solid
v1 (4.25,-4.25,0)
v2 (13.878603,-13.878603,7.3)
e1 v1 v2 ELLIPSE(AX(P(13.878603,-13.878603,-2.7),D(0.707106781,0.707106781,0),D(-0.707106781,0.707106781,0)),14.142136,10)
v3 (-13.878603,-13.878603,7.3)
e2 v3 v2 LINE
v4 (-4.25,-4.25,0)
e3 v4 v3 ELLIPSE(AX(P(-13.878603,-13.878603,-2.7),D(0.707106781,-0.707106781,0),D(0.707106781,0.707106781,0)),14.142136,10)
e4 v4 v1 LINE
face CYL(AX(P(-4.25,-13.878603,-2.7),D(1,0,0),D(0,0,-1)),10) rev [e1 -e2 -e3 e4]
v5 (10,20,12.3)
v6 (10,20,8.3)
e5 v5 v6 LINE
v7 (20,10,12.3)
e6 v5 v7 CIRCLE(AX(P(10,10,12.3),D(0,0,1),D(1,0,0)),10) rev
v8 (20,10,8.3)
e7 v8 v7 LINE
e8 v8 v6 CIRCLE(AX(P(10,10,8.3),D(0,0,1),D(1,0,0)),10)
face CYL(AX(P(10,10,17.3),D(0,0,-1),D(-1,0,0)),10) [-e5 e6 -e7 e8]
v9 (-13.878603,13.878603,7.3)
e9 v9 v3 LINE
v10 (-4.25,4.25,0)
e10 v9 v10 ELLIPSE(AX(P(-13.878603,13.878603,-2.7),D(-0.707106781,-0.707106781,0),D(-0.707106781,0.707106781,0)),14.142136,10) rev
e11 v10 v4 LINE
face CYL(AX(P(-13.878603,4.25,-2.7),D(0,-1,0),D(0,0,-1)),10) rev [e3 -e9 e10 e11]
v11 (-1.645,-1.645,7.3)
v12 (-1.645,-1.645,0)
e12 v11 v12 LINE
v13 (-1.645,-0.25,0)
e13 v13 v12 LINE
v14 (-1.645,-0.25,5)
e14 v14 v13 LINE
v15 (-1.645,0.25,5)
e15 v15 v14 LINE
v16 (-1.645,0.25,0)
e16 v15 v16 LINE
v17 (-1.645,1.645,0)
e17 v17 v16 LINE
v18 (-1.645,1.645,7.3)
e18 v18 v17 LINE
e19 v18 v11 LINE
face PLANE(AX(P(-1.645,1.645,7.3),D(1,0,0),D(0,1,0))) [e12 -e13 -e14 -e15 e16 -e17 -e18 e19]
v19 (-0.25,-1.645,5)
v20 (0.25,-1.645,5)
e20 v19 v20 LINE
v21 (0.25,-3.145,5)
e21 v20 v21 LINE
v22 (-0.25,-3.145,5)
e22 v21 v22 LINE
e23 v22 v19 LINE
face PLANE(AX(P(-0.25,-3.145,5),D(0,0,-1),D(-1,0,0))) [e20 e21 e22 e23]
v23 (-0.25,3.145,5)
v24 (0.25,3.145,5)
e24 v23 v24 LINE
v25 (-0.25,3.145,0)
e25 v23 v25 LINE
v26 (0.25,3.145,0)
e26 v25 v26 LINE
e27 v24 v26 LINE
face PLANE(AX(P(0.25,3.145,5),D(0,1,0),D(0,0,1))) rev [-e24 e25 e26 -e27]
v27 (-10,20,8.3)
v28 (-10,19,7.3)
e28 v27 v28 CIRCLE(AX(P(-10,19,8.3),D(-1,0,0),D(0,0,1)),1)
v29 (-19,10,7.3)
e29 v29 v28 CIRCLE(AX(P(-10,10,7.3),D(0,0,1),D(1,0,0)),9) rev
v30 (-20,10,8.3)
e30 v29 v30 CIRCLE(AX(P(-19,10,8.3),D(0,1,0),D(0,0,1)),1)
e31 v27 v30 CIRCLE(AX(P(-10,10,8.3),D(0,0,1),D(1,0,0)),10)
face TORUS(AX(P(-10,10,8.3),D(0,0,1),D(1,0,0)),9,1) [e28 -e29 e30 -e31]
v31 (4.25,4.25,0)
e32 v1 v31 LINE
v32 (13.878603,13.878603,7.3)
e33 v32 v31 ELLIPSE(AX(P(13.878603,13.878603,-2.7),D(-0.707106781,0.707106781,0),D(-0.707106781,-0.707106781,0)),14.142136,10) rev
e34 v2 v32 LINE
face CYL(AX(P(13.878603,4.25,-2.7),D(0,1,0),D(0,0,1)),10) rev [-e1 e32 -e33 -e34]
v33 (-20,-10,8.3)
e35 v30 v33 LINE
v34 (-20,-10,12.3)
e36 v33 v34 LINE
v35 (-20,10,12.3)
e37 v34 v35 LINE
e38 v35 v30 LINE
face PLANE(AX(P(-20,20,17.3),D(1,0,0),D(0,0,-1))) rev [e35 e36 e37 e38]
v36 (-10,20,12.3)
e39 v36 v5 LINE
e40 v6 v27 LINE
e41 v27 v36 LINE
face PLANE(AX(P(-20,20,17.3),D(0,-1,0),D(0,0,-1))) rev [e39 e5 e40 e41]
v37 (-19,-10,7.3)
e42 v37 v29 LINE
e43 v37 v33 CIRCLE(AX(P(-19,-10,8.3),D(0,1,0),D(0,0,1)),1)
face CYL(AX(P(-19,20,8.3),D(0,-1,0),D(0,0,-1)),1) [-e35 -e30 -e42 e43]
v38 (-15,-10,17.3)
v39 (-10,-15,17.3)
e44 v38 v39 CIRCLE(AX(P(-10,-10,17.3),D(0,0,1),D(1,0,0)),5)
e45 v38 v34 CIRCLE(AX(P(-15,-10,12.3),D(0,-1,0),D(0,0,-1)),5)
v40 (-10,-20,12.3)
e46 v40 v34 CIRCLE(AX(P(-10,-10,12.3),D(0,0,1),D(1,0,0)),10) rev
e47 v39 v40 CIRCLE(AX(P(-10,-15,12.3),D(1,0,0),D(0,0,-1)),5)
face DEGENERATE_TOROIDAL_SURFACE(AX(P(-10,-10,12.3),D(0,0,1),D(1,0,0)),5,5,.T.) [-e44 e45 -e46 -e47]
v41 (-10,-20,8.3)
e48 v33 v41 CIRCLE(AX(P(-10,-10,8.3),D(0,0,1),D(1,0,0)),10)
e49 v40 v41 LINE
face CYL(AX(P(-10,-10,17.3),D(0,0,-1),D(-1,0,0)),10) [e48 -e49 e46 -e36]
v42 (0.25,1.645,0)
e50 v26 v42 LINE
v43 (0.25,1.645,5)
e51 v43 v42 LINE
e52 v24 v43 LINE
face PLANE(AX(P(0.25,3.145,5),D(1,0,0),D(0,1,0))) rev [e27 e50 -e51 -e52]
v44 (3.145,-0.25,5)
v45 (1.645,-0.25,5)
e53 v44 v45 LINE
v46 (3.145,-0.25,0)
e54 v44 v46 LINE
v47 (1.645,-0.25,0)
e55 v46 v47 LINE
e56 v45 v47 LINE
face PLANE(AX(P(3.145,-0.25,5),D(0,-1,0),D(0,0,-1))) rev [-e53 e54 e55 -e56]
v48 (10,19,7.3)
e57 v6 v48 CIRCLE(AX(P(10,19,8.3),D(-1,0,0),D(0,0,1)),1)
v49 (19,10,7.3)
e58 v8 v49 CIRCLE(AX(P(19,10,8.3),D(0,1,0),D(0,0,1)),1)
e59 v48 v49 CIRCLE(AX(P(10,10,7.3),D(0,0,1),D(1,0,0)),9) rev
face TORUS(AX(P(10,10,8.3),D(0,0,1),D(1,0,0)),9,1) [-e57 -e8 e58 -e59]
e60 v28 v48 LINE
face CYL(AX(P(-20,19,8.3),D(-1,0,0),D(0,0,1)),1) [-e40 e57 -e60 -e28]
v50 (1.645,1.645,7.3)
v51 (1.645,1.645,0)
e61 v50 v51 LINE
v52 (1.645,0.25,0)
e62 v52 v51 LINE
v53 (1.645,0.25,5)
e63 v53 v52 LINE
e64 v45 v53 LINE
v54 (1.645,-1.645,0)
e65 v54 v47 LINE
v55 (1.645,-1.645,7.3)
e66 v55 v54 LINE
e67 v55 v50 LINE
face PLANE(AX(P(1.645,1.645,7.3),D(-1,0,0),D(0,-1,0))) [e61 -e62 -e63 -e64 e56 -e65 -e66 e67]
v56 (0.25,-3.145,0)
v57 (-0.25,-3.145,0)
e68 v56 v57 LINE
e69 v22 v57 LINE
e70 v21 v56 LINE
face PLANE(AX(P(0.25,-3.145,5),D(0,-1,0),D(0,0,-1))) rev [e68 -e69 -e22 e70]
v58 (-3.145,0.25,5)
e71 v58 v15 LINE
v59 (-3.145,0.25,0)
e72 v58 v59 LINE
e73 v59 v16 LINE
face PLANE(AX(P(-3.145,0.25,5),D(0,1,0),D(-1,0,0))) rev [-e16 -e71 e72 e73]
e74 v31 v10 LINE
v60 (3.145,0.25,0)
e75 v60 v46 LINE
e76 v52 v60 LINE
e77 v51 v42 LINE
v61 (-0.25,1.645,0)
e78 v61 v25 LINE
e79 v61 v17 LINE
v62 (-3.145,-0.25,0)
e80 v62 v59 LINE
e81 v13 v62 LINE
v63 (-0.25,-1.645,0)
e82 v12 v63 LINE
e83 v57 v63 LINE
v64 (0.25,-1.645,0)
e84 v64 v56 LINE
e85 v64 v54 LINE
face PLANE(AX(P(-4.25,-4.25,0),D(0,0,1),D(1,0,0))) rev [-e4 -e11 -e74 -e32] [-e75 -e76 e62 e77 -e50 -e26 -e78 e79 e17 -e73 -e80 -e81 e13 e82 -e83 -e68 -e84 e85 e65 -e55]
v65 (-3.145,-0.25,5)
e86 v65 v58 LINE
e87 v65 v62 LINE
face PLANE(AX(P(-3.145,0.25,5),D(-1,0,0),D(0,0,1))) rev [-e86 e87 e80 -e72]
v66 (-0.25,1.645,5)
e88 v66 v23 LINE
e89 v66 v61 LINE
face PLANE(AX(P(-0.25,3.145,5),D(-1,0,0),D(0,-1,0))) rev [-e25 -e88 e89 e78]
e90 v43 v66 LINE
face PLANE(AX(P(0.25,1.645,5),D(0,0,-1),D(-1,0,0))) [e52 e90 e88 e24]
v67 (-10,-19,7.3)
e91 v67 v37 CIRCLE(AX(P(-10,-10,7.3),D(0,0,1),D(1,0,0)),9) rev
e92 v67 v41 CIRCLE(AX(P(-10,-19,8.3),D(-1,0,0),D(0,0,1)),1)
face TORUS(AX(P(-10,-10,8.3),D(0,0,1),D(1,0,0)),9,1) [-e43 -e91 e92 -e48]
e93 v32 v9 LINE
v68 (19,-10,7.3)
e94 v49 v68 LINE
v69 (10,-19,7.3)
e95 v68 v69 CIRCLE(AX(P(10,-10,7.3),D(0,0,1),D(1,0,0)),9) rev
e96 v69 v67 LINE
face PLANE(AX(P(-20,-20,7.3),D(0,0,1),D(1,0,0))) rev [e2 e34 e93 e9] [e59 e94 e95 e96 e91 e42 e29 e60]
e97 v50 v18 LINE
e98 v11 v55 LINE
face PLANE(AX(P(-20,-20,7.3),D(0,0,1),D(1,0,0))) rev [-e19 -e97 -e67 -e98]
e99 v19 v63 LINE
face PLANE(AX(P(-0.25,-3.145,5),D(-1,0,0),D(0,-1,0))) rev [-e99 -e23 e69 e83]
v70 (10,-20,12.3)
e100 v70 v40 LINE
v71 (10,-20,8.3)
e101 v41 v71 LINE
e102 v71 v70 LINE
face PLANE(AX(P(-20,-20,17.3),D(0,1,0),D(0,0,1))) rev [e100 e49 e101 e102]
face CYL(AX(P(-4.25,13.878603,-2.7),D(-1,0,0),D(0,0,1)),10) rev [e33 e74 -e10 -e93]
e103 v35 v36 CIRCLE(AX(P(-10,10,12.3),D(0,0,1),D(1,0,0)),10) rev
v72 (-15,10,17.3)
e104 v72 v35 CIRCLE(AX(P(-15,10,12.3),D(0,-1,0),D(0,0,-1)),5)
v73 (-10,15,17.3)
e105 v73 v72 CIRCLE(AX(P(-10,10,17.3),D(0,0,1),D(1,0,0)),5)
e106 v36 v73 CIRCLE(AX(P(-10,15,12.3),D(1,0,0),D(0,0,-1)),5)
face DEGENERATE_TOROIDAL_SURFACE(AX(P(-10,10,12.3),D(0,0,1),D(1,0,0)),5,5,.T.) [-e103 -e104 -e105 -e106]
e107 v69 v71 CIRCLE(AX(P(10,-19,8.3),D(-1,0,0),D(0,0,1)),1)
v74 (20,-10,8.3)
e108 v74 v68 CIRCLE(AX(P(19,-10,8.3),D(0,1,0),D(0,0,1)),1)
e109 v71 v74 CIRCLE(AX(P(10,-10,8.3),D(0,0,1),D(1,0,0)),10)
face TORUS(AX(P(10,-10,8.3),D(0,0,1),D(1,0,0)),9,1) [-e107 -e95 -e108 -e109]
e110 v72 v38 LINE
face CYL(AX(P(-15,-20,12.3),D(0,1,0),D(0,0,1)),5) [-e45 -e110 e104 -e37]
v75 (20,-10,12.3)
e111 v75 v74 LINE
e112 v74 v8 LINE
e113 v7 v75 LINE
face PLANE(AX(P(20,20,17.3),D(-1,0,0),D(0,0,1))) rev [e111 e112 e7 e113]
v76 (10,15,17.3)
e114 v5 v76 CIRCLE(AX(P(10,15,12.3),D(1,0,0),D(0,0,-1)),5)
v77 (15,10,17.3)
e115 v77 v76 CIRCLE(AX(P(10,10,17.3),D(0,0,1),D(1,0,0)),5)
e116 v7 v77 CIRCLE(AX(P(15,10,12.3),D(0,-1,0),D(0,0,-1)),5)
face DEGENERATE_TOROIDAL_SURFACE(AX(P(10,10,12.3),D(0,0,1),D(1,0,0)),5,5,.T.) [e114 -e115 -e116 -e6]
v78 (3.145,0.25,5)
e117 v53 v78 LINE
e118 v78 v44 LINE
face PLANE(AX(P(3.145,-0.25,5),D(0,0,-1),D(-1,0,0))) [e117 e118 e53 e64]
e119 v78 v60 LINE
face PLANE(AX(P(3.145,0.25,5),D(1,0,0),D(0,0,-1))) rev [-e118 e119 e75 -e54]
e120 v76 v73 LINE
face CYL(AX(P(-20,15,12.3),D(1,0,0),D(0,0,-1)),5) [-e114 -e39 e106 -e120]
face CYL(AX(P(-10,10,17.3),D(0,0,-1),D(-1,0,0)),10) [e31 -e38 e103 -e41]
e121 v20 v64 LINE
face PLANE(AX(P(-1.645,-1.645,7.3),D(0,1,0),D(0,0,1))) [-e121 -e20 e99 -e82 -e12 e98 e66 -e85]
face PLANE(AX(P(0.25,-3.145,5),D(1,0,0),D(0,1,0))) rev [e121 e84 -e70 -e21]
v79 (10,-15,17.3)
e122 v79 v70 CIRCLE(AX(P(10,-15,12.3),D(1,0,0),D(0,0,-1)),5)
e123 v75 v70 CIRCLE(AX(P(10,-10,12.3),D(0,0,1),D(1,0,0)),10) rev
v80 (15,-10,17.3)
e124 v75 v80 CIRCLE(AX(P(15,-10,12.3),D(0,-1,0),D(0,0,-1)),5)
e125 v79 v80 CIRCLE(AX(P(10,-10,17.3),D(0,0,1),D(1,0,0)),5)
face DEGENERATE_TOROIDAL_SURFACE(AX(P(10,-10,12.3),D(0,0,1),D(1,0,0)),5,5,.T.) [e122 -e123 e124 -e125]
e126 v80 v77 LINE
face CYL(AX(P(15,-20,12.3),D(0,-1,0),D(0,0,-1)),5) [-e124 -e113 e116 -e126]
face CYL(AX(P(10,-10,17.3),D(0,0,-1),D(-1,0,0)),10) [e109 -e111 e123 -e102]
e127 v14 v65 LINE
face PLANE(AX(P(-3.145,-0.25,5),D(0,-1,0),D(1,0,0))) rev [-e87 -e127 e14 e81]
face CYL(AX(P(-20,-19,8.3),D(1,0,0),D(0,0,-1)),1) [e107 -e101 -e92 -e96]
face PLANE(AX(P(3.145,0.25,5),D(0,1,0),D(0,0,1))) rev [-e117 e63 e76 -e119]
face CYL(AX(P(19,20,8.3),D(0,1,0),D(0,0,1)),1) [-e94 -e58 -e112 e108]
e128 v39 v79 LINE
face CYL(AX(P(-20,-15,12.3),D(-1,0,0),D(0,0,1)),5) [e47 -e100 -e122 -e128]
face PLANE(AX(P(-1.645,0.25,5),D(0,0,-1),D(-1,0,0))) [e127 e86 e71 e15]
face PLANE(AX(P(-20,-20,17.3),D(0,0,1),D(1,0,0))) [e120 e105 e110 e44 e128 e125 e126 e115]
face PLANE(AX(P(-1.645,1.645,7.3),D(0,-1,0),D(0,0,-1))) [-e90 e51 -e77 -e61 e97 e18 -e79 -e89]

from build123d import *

# Parameters (mm, degrees)
ESBO_O1_W                = 8.5
ESBO_O1_H                = 8.5
ESBO_O1_W_2              = 3.29
ESBO_O1_H_2              = 3.29
RESSALTO_EXTRUS_O1_DEPTH = 7.3
ESBO_O2_W                = 40
ESBO_O2_H                = 40
RESSALTO_EXTRUS_O2_DEPTH = 10
FILETE1_R                = 10
FILETE2_R                = 10
FILETE3_R                = 5
ESBO_O3_W                = 0.5
ESBO_O3_H                = 1.5
ESBO_O3_W_2              = 1.5
ESBO_O3_H_2              = 0.5
CORTE_EXTRUS_O1_DEPTH    = 5
FILETE4_R                = 1


with BuildPart() as part:
    # Esboço1 → Ressalto-extrusão1 (new body)
    with BuildSketch(Plane.XY):
        Rectangle(ESBO_O1_W, ESBO_O1_H)
        Rectangle(ESBO_O1_W_2, ESBO_O1_H_2, mode=Mode.SUBTRACT)
    extrude(amount=RESSALTO_EXTRUS_O1_DEPTH)

    # Esboço2 → Ressalto-extrusão2 (add)
    with BuildSketch(Plane.XY.offset(7.3)):
        Rectangle(ESBO_O2_W, ESBO_O2_H)
    extrude(amount=RESSALTO_EXTRUS_O2_DEPTH)

    # Filete1
    # the kernel refuses this fillet: 10 mm, written as the material it adds along each edge
    with BuildSketch(Plane(origin=(-4.25, -4.25, 7.3), x_dir=(-1, 0, 0), z_dir=(0, 1, 0)), Plane(origin=(4.25, -4.25, 7.3), x_dir=(0, -1, 0), z_dir=(-1, 0, 0)), Plane(origin=(4.25, 4.25, 7.3), x_dir=(1, 0, 0), z_dir=(0, -1, 0)), Plane(origin=(-4.25, 4.25, 7.3), x_dir=(0, 1, 0), z_dir=(1, 0, 0))) as filete1_piece_1:
        with BuildLine():
            CenterArc((9.628603222, -10), FILETE1_R, 90, 74.335733149)
            Line((0, -7.3), (-0.192572064, -7.246))
            ThreePointArc((-0.192572064, -7.246), (-0.2, -3.65), (-0.2, 0))
            Line((-0.2, 0), (0, 0.2))
            Line((0, 0.2), (9.628603222, 0.2))
            Line((9.628603222, 0.2), (9.628603222, 0))
        make_face()
    extrude(amount=8.5)
    with BuildSketch(Plane(origin=(4.25, -4.25, 7.3), x_dir=(0, -1, 0), z_dir=(-1, 0, 0))) as filete1_piece_2a_section:
        with BuildLine():
            CenterArc((9.628603222, -10), FILETE1_R, 90, 74.335733149)
            Line((0, -7.3), (-0.192572064, -7.246))
            ThreePointArc((-0.192572064, -7.246), (-0.2, -3.65), (-0.2, 0))
            Line((-0.2, 0), (0, 0.2))
            Line((0, 0.2), (9.628603222, 0.2))
            Line((9.628603222, 0.2), (9.628603222, 0))
        make_face()
    filete1_piece_2a = extrude(amount=32.571508054, mode=Mode.PRIVATE)
    filete1_piece_2a = split(filete1_piece_2a, bisect_by=Plane(origin=(-20, -6.528048656, 5.446397175), z_dir=(1, 0, 0)), keep=Keep.TOP, mode=Mode.PRIVATE)
    filete1_piece_2a = split(filete1_piece_2a, bisect_by=Plane(origin=(-4.25, -6.528048656, 5.446397175), z_dir=(-1, 0, 0)), keep=Keep.TOP, mode=Mode.PRIVATE)
    with BuildSketch(Plane(origin=(-4.25, -28.321508054, 7.3), x_dir=(-1, 0, 0), z_dir=(0, 1, 0))) as filete1_piece_2b_section:
        with BuildLine():
            CenterArc((9.628603222, -10), FILETE1_R, 90, 74.335733149)
            Line((0, -7.3), (-0.192572064, -7.246))
            ThreePointArc((-0.192572064, -7.246), (-0.2, -3.65), (-0.2, 0))
            Line((-0.2, 0), (0, 0.2))
            Line((0, 0.2), (9.628603222, 0.2))
            Line((9.628603222, 0.2), (9.628603222, 0))
        make_face()
    filete1_piece_2b = extrude(amount=32.571508054, mode=Mode.PRIVATE)
    filete1_piece_2b = split(filete1_piece_2b, bisect_by=Plane(origin=(-6.528048656, -20, 5.446397175), z_dir=(0, 1, 0)), keep=Keep.TOP, mode=Mode.PRIVATE)
    filete1_piece_2b = split(filete1_piece_2b, bisect_by=Plane(origin=(-6.528048656, -4.25, 5.446397175), z_dir=(0, -1, 0)), keep=Keep.TOP, mode=Mode.PRIVATE)
    filete1_piece_2 = filete1_piece_2a & filete1_piece_2b
    add(filete1_piece_2)
    with BuildSketch(Plane(origin=(-28.321508054, 4.25, 7.3), x_dir=(0, 1, 0), z_dir=(1, 0, 0))) as filete1_piece_3a_section:
        with BuildLine():
            CenterArc((9.628603222, -10), FILETE1_R, 90, 74.335733149)
            Line((0, -7.3), (-0.192572064, -7.246))
            ThreePointArc((-0.192572064, -7.246), (-0.2, -3.65), (-0.2, 0))
            Line((-0.2, 0), (0, 0.2))
            Line((0, 0.2), (9.628603222, 0.2))
            Line((9.628603222, 0.2), (9.628603222, 0))
        make_face()
    filete1_piece_3a = extrude(amount=32.571508054, mode=Mode.PRIVATE)
    filete1_piece_3a = split(filete1_piece_3a, bisect_by=Plane(origin=(-20, 6.528048656, 5.446397175), z_dir=(1, 0, 0)), keep=Keep.TOP, mode=Mode.PRIVATE)
    filete1_piece_3a = split(filete1_piece_3a, bisect_by=Plane(origin=(-4.25, 6.528048656, 5.446397175), z_dir=(-1, 0, 0)), keep=Keep.TOP, mode=Mode.PRIVATE)
    with BuildSketch(Plane(origin=(-4.25, -4.25, 7.3), x_dir=(-1, 0, 0), z_dir=(0, 1, 0))) as filete1_piece_3b_section:
        with BuildLine():
            CenterArc((9.628603222, -10), FILETE1_R, 90, 74.335733149)
            Line((0, -7.3), (-0.192572064, -7.246))
            ThreePointArc((-0.192572064, -7.246), (-0.2, -3.65), (-0.2, 0))
            Line((-0.2, 0), (0, 0.2))
            Line((0, 0.2), (9.628603222, 0.2))
            Line((9.628603222, 0.2), (9.628603222, 0))
        make_face()
    filete1_piece_3b = extrude(amount=32.571508054, mode=Mode.PRIVATE)
    filete1_piece_3b = split(filete1_piece_3b, bisect_by=Plane(origin=(-6.528048656, 20, 5.446397175), z_dir=(0, -1, 0)), keep=Keep.TOP, mode=Mode.PRIVATE)
    filete1_piece_3b = split(filete1_piece_3b, bisect_by=Plane(origin=(-6.528048656, 4.25, 5.446397175), z_dir=(0, 1, 0)), keep=Keep.TOP, mode=Mode.PRIVATE)
    filete1_piece_3 = filete1_piece_3a & filete1_piece_3b
    add(filete1_piece_3)
    with BuildSketch(Plane(origin=(4.25, 4.25, 7.3), x_dir=(1, 0, 0), z_dir=(0, -1, 0))) as filete1_piece_4a_section:
        with BuildLine():
            CenterArc((9.628603222, -10), FILETE1_R, 90, 74.335733149)
            Line((0, -7.3), (-0.192572064, -7.246))
            ThreePointArc((-0.192572064, -7.246), (-0.2, -3.65), (-0.2, 0))
            Line((-0.2, 0), (0, 0.2))
            Line((0, 0.2), (9.628603222, 0.2))
            Line((9.628603222, 0.2), (9.628603222, 0))
        make_face()
    filete1_piece_4a = extrude(amount=32.571508054, mode=Mode.PRIVATE)
    filete1_piece_4a = split(filete1_piece_4a, bisect_by=Plane(origin=(6.528048656, -20, 5.446397175), z_dir=(0, 1, 0)), keep=Keep.TOP, mode=Mode.PRIVATE)
    filete1_piece_4a = split(filete1_piece_4a, bisect_by=Plane(origin=(6.528048656, -4.25, 5.446397175), z_dir=(0, -1, 0)), keep=Keep.TOP, mode=Mode.PRIVATE)
    with BuildSketch(Plane(origin=(28.321508054, -4.25, 7.3), x_dir=(0, -1, 0), z_dir=(-1, 0, 0))) as filete1_piece_4b_section:
        with BuildLine():
            CenterArc((9.628603222, -10), FILETE1_R, 90, 74.335733149)
            Line((0, -7.3), (-0.192572064, -7.246))
            ThreePointArc((-0.192572064, -7.246), (-0.2, -3.65), (-0.2, 0))
            Line((-0.2, 0), (0, 0.2))
            Line((0, 0.2), (9.628603222, 0.2))
            Line((9.628603222, 0.2), (9.628603222, 0))
        make_face()
    filete1_piece_4b = extrude(amount=32.571508054, mode=Mode.PRIVATE)
    filete1_piece_4b = split(filete1_piece_4b, bisect_by=Plane(origin=(20, -6.528048656, 5.446397175), z_dir=(-1, 0, 0)), keep=Keep.TOP, mode=Mode.PRIVATE)
    filete1_piece_4b = split(filete1_piece_4b, bisect_by=Plane(origin=(4.25, -6.528048656, 5.446397175), z_dir=(1, 0, 0)), keep=Keep.TOP, mode=Mode.PRIVATE)
    filete1_piece_4 = filete1_piece_4a & filete1_piece_4b
    add(filete1_piece_4)
    with BuildSketch(Plane(origin=(-4.25, 4.25, 7.3), x_dir=(0, 1, 0), z_dir=(1, 0, 0))) as filete1_piece_5a_section:
        with BuildLine():
            CenterArc((9.628603222, -10), FILETE1_R, 90, 74.335733149)
            Line((0, -7.3), (-0.192572064, -7.246))
            ThreePointArc((-0.192572064, -7.246), (-0.2, -3.65), (-0.2, 0))
            Line((-0.2, 0), (0, 0.2))
            Line((0, 0.2), (9.628603222, 0.2))
            Line((9.628603222, 0.2), (9.628603222, 0))
        make_face()
    filete1_piece_5a = extrude(amount=32.571508054, mode=Mode.PRIVATE)
    filete1_piece_5a = split(filete1_piece_5a, bisect_by=Plane(origin=(20, 6.528048656, 5.446397175), z_dir=(-1, 0, 0)), keep=Keep.TOP, mode=Mode.PRIVATE)
    filete1_piece_5a = split(filete1_piece_5a, bisect_by=Plane(origin=(4.25, 6.528048656, 5.446397175), z_dir=(1, 0, 0)), keep=Keep.TOP, mode=Mode.PRIVATE)
    with BuildSketch(Plane(origin=(4.25, 28.321508054, 7.3), x_dir=(1, 0, 0), z_dir=(0, -1, 0))) as filete1_piece_5b_section:
        with BuildLine():
            CenterArc((9.628603222, -10), FILETE1_R, 90, 74.335733149)
            Line((0, -7.3), (-0.192572064, -7.246))
            ThreePointArc((-0.192572064, -7.246), (-0.2, -3.65), (-0.2, 0))
            Line((-0.2, 0), (0, 0.2))
            Line((0, 0.2), (9.628603222, 0.2))
            Line((9.628603222, 0.2), (9.628603222, 0))
        make_face()
    filete1_piece_5b = extrude(amount=32.571508054, mode=Mode.PRIVATE)
    filete1_piece_5b = split(filete1_piece_5b, bisect_by=Plane(origin=(6.528048656, 20, 5.446397175), z_dir=(0, -1, 0)), keep=Keep.TOP, mode=Mode.PRIVATE)
    filete1_piece_5b = split(filete1_piece_5b, bisect_by=Plane(origin=(6.528048656, 4.25, 5.446397175), z_dir=(0, 1, 0)), keep=Keep.TOP, mode=Mode.PRIVATE)
    filete1_piece_5 = filete1_piece_5a & filete1_piece_5b
    add(filete1_piece_5)

    # Filete2
    filete2_edges = [part.edges().sort_by_distance(p)[0] for p in [
        (-20, 20, 12.3),
        (-20, -20, 12.3),
        (20, -20, 12.3),
        (20, 20, 12.3),
    ]]
    fillet(filete2_edges, radius=FILETE2_R)

    # Filete3
    filete3_edges = [part.edges().sort_by_distance(p)[0] for p in [
        (0, 20, 17.3),
        (20, 0, 17.3),
        (-20, 0, 17.3),
        (0, -20, 17.3),
        (-17.071067812, 17.071067812, 17.3),
        (-17.071067812, -17.071067812, 17.3),
        (17.071067812, -17.071067812, 17.3),
        (17.071067812, 17.071067812, 17.3),
    ]]
    fillet(filete3_edges, radius=FILETE3_R)

    # Esboço3 → Corte-extrusão1 (cut)
    with BuildSketch(Plane(origin=(0, 0, 0), x_dir=(-1, 0, 0), z_dir=(0, 0, -1))):
        with Locations((0, 2.395)):
            Rectangle(ESBO_O3_W, ESBO_O3_H)
        with Locations((0, -2.395)):
            Rectangle(ESBO_O3_W, ESBO_O3_H)
        with Locations((2.395, 0)):
            Rectangle(ESBO_O3_W_2, ESBO_O3_H_2)
        with Locations((-2.395, 0)):
            Rectangle(ESBO_O3_W_2, ESBO_O3_H_2)
    extrude(amount=-CORTE_EXTRUS_O1_DEPTH, mode=Mode.SUBTRACT)

    # Filete4
    filete4_edges = [part.edges().sort_by_distance(p)[0] for p in [
        (0, 20, 7.3),
        (-20, 0, 7.3),
        (20, 0, 7.3),
        (0, -20, 7.3),
        (-17.071067812, 17.071067812, 7.3),
        (-17.071067812, -17.071067812, 7.3),
        (17.071067812, -17.071067812, 7.3),
        (17.071067812, 17.071067812, 7.3),
    ]]
    fillet(filete4_edges, radius=FILETE4_R)


solid = part.part
